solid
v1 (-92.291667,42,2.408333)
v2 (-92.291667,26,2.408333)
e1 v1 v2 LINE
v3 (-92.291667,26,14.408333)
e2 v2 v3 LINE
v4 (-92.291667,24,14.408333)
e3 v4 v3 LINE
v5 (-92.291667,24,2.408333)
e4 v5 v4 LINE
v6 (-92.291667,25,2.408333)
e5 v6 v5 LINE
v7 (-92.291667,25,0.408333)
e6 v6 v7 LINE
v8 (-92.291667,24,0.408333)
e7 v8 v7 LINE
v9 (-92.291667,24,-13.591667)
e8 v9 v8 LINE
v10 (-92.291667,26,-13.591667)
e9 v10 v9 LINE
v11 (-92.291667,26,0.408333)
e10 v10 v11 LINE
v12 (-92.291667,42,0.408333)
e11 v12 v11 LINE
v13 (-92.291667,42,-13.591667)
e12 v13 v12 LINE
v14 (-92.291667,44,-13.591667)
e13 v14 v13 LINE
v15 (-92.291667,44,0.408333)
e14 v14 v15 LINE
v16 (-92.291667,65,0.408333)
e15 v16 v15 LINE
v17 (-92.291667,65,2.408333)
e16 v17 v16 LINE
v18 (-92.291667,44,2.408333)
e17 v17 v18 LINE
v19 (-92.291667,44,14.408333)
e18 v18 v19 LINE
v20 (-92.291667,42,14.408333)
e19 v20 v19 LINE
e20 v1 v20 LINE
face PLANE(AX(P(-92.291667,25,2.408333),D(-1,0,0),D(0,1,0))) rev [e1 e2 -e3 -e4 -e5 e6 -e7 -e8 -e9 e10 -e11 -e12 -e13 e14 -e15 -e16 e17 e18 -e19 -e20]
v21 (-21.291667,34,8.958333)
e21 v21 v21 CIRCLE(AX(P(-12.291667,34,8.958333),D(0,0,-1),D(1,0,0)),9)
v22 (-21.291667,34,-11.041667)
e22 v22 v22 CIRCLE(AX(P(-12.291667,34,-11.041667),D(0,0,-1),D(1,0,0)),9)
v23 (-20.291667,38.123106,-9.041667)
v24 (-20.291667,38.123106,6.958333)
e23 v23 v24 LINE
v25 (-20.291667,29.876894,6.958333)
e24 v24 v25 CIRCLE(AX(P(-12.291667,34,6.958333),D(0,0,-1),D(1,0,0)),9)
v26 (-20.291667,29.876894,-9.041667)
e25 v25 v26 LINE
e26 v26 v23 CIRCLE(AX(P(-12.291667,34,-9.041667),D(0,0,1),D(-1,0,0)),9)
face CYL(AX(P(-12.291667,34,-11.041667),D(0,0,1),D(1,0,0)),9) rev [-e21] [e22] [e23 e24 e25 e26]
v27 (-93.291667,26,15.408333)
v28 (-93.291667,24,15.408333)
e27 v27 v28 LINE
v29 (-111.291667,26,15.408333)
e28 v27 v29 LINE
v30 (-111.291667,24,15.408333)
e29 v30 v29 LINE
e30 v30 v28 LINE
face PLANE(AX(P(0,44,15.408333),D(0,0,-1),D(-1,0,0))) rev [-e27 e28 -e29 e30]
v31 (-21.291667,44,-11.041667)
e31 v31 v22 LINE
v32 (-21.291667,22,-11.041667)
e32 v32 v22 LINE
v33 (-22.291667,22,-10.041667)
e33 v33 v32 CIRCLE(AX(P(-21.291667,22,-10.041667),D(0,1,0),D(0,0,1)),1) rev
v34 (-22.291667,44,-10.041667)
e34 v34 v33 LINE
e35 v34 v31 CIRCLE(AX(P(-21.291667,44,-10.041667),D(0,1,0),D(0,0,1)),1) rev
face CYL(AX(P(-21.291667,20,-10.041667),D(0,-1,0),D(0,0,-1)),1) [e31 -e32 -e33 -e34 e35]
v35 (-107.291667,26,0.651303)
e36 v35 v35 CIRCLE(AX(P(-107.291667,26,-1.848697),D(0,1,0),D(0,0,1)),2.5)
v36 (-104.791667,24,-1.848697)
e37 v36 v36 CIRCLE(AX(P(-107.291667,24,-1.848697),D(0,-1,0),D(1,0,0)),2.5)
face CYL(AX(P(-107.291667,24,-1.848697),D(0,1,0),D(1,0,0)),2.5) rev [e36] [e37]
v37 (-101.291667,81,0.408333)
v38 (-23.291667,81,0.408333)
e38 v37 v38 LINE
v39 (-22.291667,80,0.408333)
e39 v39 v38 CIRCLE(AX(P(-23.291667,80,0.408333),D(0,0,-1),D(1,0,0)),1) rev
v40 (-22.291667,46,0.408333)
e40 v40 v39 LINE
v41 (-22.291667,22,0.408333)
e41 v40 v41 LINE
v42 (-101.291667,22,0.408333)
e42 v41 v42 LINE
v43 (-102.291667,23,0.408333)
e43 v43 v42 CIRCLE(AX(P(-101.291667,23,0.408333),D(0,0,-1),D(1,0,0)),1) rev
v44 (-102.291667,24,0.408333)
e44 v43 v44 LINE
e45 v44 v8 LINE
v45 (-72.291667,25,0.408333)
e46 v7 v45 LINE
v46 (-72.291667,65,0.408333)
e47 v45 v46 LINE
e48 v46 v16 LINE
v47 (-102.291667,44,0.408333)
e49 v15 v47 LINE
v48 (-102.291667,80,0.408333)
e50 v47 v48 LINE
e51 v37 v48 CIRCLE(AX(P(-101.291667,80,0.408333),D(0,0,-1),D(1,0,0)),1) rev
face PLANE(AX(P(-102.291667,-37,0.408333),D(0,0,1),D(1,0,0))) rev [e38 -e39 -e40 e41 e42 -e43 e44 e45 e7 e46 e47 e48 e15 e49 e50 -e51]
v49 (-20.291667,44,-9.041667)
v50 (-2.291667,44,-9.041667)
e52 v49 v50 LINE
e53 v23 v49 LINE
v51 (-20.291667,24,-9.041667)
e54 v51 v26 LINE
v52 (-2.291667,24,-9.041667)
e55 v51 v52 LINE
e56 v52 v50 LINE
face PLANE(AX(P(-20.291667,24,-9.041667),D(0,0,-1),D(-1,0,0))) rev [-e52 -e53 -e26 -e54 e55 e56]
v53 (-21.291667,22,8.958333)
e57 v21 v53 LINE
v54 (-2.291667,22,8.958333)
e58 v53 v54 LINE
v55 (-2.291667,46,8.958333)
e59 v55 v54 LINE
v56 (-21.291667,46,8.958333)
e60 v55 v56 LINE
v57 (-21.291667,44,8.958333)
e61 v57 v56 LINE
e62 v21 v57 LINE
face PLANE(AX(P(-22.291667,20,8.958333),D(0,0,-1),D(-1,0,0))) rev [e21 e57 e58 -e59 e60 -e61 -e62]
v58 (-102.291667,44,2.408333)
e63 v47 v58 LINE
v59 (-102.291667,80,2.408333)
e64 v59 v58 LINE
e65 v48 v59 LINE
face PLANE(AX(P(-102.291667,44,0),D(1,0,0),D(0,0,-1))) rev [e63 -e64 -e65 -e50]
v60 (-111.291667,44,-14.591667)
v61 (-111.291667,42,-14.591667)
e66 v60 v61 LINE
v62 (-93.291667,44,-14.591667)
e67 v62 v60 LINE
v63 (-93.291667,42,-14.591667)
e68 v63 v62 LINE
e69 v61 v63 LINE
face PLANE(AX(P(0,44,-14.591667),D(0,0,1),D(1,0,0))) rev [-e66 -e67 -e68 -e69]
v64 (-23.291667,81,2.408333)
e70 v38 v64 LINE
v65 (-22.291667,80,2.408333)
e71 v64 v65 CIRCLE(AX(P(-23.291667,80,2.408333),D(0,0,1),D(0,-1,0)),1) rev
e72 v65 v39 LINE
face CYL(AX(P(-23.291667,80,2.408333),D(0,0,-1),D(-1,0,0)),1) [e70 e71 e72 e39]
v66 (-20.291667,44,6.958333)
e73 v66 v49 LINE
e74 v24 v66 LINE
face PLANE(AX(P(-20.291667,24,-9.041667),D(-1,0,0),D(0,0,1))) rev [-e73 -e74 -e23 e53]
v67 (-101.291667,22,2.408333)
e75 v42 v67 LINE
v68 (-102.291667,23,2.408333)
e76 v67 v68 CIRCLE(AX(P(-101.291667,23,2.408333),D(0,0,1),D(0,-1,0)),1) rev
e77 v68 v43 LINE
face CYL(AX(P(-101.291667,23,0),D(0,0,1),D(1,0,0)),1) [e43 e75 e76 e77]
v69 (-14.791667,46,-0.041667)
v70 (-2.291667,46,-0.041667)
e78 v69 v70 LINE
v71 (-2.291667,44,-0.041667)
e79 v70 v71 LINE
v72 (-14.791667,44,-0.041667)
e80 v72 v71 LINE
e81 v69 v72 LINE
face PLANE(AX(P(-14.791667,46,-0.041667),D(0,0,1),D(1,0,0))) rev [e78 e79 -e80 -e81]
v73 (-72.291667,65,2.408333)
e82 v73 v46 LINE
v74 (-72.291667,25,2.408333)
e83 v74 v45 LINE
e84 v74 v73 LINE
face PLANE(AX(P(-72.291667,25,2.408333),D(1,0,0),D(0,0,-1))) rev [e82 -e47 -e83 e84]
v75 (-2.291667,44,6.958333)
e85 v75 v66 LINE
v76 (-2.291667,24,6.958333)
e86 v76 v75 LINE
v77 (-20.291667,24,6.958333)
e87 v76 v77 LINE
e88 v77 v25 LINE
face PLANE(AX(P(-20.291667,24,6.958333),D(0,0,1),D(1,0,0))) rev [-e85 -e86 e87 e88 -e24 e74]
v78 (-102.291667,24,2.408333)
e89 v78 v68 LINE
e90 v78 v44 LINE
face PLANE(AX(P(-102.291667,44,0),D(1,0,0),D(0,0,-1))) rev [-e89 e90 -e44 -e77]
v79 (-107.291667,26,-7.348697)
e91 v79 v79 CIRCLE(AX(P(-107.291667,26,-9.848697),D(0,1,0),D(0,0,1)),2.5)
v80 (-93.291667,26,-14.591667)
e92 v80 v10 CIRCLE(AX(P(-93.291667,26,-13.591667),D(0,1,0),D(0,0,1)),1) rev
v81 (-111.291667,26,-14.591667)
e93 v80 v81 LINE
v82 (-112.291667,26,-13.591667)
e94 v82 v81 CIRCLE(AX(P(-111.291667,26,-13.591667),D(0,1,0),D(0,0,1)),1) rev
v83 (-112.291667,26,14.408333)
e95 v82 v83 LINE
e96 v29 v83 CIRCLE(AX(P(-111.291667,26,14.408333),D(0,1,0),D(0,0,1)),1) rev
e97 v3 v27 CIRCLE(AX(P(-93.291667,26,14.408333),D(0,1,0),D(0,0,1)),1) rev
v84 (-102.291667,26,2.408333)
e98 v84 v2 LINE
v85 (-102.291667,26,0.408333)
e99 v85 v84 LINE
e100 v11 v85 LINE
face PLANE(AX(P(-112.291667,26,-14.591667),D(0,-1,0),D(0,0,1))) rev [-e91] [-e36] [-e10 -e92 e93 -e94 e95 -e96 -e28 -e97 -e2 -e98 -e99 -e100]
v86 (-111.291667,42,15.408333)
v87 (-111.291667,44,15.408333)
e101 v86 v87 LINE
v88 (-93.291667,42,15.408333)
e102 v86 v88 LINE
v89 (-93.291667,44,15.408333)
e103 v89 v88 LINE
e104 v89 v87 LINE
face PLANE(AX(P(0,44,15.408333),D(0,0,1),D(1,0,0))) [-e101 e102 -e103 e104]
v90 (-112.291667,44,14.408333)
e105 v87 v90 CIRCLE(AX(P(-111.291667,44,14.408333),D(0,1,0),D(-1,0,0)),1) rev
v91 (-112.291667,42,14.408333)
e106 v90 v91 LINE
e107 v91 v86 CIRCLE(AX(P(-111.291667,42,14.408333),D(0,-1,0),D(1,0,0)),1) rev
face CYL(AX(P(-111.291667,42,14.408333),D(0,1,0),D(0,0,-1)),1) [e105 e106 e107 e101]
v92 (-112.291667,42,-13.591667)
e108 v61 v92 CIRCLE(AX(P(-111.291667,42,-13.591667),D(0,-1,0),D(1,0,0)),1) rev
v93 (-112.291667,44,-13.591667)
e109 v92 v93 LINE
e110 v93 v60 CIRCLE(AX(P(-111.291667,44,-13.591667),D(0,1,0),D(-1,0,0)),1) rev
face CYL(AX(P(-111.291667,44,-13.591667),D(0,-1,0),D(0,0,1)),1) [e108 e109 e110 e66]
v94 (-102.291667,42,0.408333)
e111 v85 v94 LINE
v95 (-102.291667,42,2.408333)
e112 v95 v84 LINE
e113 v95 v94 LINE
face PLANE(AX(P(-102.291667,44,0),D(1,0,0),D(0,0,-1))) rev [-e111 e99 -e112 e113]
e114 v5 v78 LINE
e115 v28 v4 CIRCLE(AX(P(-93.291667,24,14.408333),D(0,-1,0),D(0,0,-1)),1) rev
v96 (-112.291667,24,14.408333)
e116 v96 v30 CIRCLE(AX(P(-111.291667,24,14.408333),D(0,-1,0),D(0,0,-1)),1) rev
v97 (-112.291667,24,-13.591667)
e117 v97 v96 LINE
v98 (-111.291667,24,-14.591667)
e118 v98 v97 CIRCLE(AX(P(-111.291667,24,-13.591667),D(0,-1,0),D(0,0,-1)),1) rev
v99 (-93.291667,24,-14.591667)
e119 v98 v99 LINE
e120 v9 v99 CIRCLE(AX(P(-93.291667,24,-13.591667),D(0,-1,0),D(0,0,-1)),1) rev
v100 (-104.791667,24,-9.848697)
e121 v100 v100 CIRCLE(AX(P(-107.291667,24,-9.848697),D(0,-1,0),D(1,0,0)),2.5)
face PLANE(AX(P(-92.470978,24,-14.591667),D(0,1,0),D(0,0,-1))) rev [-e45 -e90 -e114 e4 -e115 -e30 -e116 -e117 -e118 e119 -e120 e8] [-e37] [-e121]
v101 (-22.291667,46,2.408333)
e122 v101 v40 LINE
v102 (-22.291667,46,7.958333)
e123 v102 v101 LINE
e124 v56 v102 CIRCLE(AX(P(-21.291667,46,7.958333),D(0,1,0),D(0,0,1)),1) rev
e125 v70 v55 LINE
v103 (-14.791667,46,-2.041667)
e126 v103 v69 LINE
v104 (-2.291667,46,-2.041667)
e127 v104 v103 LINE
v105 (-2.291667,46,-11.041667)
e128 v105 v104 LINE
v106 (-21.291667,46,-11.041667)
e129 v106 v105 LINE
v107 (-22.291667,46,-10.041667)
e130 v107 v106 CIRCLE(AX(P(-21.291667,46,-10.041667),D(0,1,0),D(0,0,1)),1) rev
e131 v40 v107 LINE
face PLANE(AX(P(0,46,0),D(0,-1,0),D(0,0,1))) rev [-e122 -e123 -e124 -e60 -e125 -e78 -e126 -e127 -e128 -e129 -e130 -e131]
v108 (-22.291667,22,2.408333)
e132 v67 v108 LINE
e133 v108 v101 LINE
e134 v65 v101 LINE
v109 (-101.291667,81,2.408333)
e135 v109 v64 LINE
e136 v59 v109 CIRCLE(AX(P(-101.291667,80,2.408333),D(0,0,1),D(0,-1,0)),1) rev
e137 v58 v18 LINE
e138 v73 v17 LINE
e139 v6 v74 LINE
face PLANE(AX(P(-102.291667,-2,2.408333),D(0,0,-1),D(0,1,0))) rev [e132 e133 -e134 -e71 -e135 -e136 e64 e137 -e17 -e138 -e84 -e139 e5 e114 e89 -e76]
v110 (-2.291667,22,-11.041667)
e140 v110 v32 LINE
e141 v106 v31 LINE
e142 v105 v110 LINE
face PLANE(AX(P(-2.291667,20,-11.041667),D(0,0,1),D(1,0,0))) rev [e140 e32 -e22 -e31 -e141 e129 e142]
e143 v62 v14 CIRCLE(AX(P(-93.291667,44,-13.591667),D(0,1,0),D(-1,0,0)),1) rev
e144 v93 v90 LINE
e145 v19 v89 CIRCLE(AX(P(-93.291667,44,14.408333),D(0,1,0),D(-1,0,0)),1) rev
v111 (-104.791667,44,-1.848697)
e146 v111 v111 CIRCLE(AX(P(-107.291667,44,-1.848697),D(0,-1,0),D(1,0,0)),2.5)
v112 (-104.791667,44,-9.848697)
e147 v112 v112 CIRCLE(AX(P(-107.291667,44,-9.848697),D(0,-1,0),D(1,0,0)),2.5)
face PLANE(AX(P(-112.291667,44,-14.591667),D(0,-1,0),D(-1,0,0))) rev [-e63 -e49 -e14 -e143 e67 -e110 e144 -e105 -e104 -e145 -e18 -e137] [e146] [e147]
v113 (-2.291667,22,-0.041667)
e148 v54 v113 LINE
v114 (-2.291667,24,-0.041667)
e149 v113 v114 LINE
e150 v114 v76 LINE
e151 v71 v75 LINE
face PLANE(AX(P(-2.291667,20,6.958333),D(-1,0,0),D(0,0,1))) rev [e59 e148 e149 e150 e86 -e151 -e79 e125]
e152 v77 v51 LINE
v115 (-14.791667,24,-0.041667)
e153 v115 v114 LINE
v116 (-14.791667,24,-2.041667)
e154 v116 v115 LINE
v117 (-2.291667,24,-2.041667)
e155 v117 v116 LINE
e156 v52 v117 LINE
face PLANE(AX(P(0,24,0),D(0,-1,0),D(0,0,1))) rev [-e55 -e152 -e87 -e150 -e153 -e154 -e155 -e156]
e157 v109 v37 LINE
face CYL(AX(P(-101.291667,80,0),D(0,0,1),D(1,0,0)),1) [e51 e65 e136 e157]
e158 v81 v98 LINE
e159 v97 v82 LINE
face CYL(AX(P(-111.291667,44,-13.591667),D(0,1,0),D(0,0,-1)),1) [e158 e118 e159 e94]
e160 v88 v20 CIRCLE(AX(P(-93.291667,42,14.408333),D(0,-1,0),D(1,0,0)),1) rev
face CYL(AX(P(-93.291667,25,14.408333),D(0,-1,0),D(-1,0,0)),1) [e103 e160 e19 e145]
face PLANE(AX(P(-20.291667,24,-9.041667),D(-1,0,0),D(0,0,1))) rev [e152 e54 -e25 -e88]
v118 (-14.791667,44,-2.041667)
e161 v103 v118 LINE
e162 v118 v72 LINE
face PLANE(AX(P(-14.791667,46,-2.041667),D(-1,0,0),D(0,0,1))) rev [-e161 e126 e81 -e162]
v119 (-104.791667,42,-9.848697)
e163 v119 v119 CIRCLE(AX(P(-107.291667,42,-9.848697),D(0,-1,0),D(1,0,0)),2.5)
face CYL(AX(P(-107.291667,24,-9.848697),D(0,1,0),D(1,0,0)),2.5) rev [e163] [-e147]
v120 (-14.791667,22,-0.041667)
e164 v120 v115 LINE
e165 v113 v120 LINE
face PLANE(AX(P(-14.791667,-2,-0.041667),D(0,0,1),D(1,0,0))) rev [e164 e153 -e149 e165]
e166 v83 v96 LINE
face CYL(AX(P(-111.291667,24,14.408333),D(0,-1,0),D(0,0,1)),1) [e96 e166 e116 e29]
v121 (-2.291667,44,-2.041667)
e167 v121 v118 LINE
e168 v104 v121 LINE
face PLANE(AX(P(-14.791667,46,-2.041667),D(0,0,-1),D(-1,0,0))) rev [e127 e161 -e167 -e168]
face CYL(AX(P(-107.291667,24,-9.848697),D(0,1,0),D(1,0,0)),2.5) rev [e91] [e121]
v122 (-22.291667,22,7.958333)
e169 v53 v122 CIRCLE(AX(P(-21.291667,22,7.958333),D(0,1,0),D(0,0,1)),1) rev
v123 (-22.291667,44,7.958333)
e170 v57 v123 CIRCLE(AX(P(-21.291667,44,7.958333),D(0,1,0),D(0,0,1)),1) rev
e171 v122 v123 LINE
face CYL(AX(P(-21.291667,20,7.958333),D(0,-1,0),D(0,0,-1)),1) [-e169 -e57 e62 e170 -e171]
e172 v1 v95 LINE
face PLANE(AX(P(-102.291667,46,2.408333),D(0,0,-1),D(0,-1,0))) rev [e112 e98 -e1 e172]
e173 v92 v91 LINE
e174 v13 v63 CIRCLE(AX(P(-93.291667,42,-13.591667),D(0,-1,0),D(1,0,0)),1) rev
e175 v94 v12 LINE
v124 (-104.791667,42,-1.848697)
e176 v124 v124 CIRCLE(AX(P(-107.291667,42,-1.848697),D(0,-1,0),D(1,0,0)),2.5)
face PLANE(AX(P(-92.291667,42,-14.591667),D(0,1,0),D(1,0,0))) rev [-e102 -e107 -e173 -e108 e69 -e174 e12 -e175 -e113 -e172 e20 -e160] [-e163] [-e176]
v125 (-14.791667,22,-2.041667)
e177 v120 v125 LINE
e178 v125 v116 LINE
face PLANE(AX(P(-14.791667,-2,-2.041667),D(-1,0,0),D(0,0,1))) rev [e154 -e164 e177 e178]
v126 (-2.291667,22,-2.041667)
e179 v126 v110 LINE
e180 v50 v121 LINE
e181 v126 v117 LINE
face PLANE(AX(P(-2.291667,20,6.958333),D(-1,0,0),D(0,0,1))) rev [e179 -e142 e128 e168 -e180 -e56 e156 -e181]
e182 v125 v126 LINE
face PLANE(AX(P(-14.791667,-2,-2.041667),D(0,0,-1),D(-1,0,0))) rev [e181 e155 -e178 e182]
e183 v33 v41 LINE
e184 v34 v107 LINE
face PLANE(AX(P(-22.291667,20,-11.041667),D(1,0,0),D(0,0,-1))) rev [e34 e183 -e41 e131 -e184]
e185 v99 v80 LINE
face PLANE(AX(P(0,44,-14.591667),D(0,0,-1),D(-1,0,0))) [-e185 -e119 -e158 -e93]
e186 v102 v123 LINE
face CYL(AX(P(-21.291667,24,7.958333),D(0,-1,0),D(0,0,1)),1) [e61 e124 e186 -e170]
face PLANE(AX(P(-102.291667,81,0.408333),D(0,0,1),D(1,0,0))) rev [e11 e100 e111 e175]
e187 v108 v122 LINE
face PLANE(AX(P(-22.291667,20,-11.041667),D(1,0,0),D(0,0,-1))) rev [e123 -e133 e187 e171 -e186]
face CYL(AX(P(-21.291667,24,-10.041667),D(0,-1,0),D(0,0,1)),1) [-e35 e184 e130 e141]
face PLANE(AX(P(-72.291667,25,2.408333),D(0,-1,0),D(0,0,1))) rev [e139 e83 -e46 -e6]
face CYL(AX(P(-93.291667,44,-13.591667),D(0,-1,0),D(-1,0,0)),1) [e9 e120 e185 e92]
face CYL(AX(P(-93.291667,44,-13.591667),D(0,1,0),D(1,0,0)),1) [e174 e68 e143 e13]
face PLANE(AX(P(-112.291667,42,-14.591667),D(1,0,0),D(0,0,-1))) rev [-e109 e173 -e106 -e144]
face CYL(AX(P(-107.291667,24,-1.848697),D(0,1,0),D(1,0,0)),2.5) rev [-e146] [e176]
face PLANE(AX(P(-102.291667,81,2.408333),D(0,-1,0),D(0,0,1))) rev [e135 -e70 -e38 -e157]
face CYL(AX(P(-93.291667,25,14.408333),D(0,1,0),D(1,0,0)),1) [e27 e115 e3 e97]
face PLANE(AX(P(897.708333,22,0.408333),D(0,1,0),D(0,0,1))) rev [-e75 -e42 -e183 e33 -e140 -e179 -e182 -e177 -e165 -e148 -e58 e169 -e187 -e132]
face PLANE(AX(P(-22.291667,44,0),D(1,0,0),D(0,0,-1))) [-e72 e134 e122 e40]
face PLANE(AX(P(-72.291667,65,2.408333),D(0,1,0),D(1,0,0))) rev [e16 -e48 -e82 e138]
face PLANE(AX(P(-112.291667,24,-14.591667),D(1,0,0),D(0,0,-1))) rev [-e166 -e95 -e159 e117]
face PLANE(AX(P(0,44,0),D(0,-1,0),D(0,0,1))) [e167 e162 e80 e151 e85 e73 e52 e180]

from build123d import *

# Parameters (mm, degrees)
BOSS_EXTRUDE1_DEPTH = 20
FILLET1_R           = 1
SKETCH2_R           = 9
CUT_EXTRUDE1_DEPTH  = 20
BOSS_EXTRUDE2_START = 2
BOSS_EXTRUDE2_DEPTH = 2
SKETCH4_W           = 20
SKETCH4_H           = 20
BOSS_EXTRUDE3_DEPTH = 2
FILLET2_R           = 1
SKETCH5_W           = 12.5
SKETCH5_H           = 2
CUT_EXTRUDE2_DEPTH  = 24
BOSS_EXTRUDE4_DEPTH = 80
FILLET3_R           = 1
SKETCH8_R           = 7.11392485
SKETCH8_W           = 20
SKETCH8_H           = 40
CUT_EXTRUDE3_DEPTH  = 2
SKETCH9_W           = 20
SKETCH9_H           = 2
BOSS_EXTRUDE5_DEPTH = 15
FILLET4_R           = 1
SKETCH10_R          = 2.5
CUT_EXTRUDE4_DEPTH  = 20
CUT_EXTRUDE5_DEPTH  = 1000
SKETCH12_W          = 38.052123651
SKETCH12_H          = 24.689337754
CUT_EXTRUDE6_DEPTH  = 200


with BuildPart() as part:
    # Sketch1 → Boss-Extrude1 (new body)
    with BuildSketch(Plane(origin=(0, 0, 0), x_dir=(1, 0, 0), z_dir=(0, 1, 0))):
        Polygon((-2.291666667, 11.041666667), (-22.291666667, 11.041666667), (-22.291666667, -8.958333333), (-2.291666667, -8.958333333), (-2.291666667, -6.958333333), (-20.291666667, -6.958333333), (-20.291666667, 9.041666667), (-2.291666667, 9.041666667), align=None)
    extrude(amount=BOSS_EXTRUDE1_DEPTH)

    # Fillet1
    fillet1_edges = [part.edges().sort_by_distance(p)[0] for p in [
        (-22.291666667, 10, 8.958333333),
        (-22.291666667, 10, -11.041666667),
    ]]
    fillet(fillet1_edges, radius=FILLET1_R)

    # Sketch2 → Cut-Extrude1 (cut)
    with BuildSketch(Plane.XY.offset(8.958333333)):
        with Locations(Location((-12.291666667, 10, 0), (0, 0, 180))):
            Circle(SKETCH2_R)
    extrude(amount=-CUT_EXTRUDE1_DEPTH, mode=Mode.SUBTRACT)

    # Sketch3 → Boss-Extrude2 (add)
    with BuildSketch(Plane(origin=(0, 20, 0), x_dir=(1, 0, 0), z_dir=(0, 1, 0)).offset(BOSS_EXTRUDE2_START)):
        Polygon((-2.291666667, 2.377848536), (-2.291666667, 9.041666667), (-20.291666667, 9.041666667), (-20.291666667, -6.958333333), (-2.291666667, -6.958333333), (-2.291666667, 0.377848536), align=None)
        with BuildLine():
            Line((-2.291666667, 9.041666667), (-2.291666667, 11.041666667))
            Line((-2.291666667, 11.041666667), (-21.291666667, 11.041666667))
            ThreePointArc((-21.291666667, 11.041666667), (-21.998773448, 10.748773448), (-22.291666667, 10.041666667))
            Line((-22.291666667, 10.041666667), (-22.291666667, -7.958333333))
            ThreePointArc((-22.291666667, -7.958333333), (-21.998773448, -8.665440115), (-21.291666667, -8.958333333))
            Line((-21.291666667, -8.958333333), (-2.291666667, -8.958333333))
            Line((-2.291666667, -8.958333333), (-2.291666667, -6.958333333))
            Line((-2.291666667, -6.958333333), (-20.291666667, -6.958333333))
            Line((-20.291666667, -6.958333333), (-20.291666667, 9.041666667))
            Line((-20.291666667, 9.041666667), (-2.291666667, 9.041666667))
        make_face()
    extrude(amount=-BOSS_EXTRUDE2_DEPTH)

    # Sketch4 → Boss-Extrude3 (add)
    with BuildSketch(Plane.XZ):
        with Locations((-12.291666667, -1.041666667)):
            Rectangle(SKETCH4_W, SKETCH4_H)
    extrude(amount=BOSS_EXTRUDE3_DEPTH)

    # Fillet2
    fillet2_edges = [part.edges().sort_by_distance(p)[0] for p in [
        (-22.291666667, -1, -11.041666667),
        (-22.291666667, -1, 8.958333333),
    ]]
    fillet(fillet2_edges, radius=FILLET2_R - 0.0001)  # a hair under: the kernel refuses the full size

    # Sketch5 → Cut-Extrude2 (cut)
    with BuildSketch(Plane(origin=(0, 22, 0), x_dir=(1, 0, 0), z_dir=(0, 1, 0))):
        with Locations((-8.541666667, 1.041666667)):
            Rectangle(SKETCH5_W, SKETCH5_H)
    extrude(amount=-CUT_EXTRUDE2_DEPTH, mode=Mode.SUBTRACT)

    # Sketch6 → Boss-Extrude4 (add)
    with BuildSketch(Plane.ZY.offset(22.291666667)):
        Polygon((2.408333333, -37), (0.408333333, -37), (0.408333333, -2), (0.408333333, 22), (2.408333333, 22), (2.408333333, -2), align=None)
    extrude(amount=BOSS_EXTRUDE4_DEPTH)

    # Fillet3
    fillet3_edges = [part.edges().sort_by_distance(p)[0] for p in [
        (-22.291666667, -37, 1.408333333),
        (-102.291666667, 22, 1.408333333),
        (-102.291666667, -37, 1.408333333),
    ]]
    fillet(fillet3_edges, radius=FILLET3_R)

    # Sketch8 → Cut-Extrude3 (cut)
    with BuildSketch(Plane(origin=(0, 0, 0.408333333), x_dir=(-1, 0, 0), z_dir=(0, 0, -1))):
        with Locations((12.291666667, 10)):
            Circle(SKETCH8_R)
        with Locations((82.291666667, -1)):
            Rectangle(SKETCH8_W, SKETCH8_H)
    extrude(amount=-CUT_EXTRUDE3_DEPTH, mode=Mode.SUBTRACT)

    # Sketch9 → Boss-Extrude5 (add, symmetric)
    with BuildSketch(Plane(origin=(0, 0, 0.408333333), x_dir=(-1, 0, 0), z_dir=(0, 0, -1))):
        Polygon((92.470978063, 20), (102.291666667, 20), (112.291666667, 20), (112.291666667, 18), (102.291666667, 18), (92.291666667, 18), (92.291666667, 20), align=None)
        with Locations((102.291666667, 1)):
            Rectangle(SKETCH9_W, SKETCH9_H)
    extrude(amount=BOSS_EXTRUDE5_DEPTH, both=True)

    # Fillet4
    fillet4_edges = [part.edges().sort_by_distance(p)[0] for p in [
        (-92.291666667, 19, 15.408333333),
        (-112.291666667, 19, 15.408333333),
        (-92.291666667, 19, -14.591666667),
        (-112.291666667, 19, -14.591666667),
        (-92.291666667, 1, 15.408333333),
        (-112.291666667, 1, 15.408333333),
        (-92.291666667, 1, -14.591666667),
        (-112.291666667, 1, -14.591666667),
    ]]
    fillet(fillet4_edges, radius=FILLET4_R)

    # Sketch10 → Cut-Extrude4 (cut)
    with BuildSketch(Plane.XZ):
        with Locations((-107.291666667, -1.848697286)):
            Circle(SKETCH10_R)
        with Locations((-107.291666667, -9.848697286)):
            Circle(SKETCH10_R)
    extrude(amount=-CUT_EXTRUDE4_DEPTH, mode=Mode.SUBTRACT)

    # Mirror1: part across plane


with BuildPart() as part_1:
    add(part.part)
    add(part.part.mirror(Plane.ZX.offset(22)))

    # Sketch11 → Cut-Extrude5 (cut)
    with BuildSketch(Plane.ZY.offset(102.291666667)):
        Polygon((0.408333333, 22), (17.6685399, 22), (17.6685399, -41.876309172), (-35.169754822, -41.876309172), (-35.169754822, 22), align=None)
    extrude(amount=-CUT_EXTRUDE5_DEPTH, mode=Mode.SUBTRACT)


with BuildPart() as cut_extrude5_piece_1:
    # of the separate pieces the step leaves, piece 1, a body of its own (cut_extrude5_pieces)
    add(part_1.part.solids().sort_by_distance((-101.291666667, 22, 2.408333333))[0])


with BuildPart() as cut_extrude5_piece_2:
    # of the separate pieces the step leaves, piece 2, a body of its own (cut_extrude5_pieces)
    add(part_1.part.solids().sort_by_distance((-102.291666667, 2, -14.591666667))[0])


with BuildPart() as cut_extrude5_piece_3:
    # of the separate pieces the step leaves, piece 3, a body of its own (cut_extrude5_pieces)
    add(part_1.part.solids().sort_by_distance((-111.291666667, 20, 15.408333333))[0])


with BuildPart() as cut_extrude6_tool:
    # Sketch12 → Cut-Extrude6 (new body)
    with BuildSketch(Plane.ZY.offset(112.291666667)):
        with Locations((0.662862589, 8.620210787)):
            Rectangle(SKETCH12_W, SKETCH12_H)
    extrude(amount=-CUT_EXTRUDE6_DEPTH)


with BuildPart() as cut_extrude5_piece_2_1:
    add(cut_extrude5_piece_2.part)

    # Cut-Extrude6: cut by cut_extrude6_tool
    add(cut_extrude6_tool.part, mode=Mode.SUBTRACT)


with BuildPart() as cut_extrude5_piece_3_1:
    add(cut_extrude5_piece_3.part)

    # Cut-Extrude6: cut by cut_extrude6_tool
    add(cut_extrude6_tool.part, mode=Mode.SUBTRACT)


solid = cut_extrude5_piece_1.part
